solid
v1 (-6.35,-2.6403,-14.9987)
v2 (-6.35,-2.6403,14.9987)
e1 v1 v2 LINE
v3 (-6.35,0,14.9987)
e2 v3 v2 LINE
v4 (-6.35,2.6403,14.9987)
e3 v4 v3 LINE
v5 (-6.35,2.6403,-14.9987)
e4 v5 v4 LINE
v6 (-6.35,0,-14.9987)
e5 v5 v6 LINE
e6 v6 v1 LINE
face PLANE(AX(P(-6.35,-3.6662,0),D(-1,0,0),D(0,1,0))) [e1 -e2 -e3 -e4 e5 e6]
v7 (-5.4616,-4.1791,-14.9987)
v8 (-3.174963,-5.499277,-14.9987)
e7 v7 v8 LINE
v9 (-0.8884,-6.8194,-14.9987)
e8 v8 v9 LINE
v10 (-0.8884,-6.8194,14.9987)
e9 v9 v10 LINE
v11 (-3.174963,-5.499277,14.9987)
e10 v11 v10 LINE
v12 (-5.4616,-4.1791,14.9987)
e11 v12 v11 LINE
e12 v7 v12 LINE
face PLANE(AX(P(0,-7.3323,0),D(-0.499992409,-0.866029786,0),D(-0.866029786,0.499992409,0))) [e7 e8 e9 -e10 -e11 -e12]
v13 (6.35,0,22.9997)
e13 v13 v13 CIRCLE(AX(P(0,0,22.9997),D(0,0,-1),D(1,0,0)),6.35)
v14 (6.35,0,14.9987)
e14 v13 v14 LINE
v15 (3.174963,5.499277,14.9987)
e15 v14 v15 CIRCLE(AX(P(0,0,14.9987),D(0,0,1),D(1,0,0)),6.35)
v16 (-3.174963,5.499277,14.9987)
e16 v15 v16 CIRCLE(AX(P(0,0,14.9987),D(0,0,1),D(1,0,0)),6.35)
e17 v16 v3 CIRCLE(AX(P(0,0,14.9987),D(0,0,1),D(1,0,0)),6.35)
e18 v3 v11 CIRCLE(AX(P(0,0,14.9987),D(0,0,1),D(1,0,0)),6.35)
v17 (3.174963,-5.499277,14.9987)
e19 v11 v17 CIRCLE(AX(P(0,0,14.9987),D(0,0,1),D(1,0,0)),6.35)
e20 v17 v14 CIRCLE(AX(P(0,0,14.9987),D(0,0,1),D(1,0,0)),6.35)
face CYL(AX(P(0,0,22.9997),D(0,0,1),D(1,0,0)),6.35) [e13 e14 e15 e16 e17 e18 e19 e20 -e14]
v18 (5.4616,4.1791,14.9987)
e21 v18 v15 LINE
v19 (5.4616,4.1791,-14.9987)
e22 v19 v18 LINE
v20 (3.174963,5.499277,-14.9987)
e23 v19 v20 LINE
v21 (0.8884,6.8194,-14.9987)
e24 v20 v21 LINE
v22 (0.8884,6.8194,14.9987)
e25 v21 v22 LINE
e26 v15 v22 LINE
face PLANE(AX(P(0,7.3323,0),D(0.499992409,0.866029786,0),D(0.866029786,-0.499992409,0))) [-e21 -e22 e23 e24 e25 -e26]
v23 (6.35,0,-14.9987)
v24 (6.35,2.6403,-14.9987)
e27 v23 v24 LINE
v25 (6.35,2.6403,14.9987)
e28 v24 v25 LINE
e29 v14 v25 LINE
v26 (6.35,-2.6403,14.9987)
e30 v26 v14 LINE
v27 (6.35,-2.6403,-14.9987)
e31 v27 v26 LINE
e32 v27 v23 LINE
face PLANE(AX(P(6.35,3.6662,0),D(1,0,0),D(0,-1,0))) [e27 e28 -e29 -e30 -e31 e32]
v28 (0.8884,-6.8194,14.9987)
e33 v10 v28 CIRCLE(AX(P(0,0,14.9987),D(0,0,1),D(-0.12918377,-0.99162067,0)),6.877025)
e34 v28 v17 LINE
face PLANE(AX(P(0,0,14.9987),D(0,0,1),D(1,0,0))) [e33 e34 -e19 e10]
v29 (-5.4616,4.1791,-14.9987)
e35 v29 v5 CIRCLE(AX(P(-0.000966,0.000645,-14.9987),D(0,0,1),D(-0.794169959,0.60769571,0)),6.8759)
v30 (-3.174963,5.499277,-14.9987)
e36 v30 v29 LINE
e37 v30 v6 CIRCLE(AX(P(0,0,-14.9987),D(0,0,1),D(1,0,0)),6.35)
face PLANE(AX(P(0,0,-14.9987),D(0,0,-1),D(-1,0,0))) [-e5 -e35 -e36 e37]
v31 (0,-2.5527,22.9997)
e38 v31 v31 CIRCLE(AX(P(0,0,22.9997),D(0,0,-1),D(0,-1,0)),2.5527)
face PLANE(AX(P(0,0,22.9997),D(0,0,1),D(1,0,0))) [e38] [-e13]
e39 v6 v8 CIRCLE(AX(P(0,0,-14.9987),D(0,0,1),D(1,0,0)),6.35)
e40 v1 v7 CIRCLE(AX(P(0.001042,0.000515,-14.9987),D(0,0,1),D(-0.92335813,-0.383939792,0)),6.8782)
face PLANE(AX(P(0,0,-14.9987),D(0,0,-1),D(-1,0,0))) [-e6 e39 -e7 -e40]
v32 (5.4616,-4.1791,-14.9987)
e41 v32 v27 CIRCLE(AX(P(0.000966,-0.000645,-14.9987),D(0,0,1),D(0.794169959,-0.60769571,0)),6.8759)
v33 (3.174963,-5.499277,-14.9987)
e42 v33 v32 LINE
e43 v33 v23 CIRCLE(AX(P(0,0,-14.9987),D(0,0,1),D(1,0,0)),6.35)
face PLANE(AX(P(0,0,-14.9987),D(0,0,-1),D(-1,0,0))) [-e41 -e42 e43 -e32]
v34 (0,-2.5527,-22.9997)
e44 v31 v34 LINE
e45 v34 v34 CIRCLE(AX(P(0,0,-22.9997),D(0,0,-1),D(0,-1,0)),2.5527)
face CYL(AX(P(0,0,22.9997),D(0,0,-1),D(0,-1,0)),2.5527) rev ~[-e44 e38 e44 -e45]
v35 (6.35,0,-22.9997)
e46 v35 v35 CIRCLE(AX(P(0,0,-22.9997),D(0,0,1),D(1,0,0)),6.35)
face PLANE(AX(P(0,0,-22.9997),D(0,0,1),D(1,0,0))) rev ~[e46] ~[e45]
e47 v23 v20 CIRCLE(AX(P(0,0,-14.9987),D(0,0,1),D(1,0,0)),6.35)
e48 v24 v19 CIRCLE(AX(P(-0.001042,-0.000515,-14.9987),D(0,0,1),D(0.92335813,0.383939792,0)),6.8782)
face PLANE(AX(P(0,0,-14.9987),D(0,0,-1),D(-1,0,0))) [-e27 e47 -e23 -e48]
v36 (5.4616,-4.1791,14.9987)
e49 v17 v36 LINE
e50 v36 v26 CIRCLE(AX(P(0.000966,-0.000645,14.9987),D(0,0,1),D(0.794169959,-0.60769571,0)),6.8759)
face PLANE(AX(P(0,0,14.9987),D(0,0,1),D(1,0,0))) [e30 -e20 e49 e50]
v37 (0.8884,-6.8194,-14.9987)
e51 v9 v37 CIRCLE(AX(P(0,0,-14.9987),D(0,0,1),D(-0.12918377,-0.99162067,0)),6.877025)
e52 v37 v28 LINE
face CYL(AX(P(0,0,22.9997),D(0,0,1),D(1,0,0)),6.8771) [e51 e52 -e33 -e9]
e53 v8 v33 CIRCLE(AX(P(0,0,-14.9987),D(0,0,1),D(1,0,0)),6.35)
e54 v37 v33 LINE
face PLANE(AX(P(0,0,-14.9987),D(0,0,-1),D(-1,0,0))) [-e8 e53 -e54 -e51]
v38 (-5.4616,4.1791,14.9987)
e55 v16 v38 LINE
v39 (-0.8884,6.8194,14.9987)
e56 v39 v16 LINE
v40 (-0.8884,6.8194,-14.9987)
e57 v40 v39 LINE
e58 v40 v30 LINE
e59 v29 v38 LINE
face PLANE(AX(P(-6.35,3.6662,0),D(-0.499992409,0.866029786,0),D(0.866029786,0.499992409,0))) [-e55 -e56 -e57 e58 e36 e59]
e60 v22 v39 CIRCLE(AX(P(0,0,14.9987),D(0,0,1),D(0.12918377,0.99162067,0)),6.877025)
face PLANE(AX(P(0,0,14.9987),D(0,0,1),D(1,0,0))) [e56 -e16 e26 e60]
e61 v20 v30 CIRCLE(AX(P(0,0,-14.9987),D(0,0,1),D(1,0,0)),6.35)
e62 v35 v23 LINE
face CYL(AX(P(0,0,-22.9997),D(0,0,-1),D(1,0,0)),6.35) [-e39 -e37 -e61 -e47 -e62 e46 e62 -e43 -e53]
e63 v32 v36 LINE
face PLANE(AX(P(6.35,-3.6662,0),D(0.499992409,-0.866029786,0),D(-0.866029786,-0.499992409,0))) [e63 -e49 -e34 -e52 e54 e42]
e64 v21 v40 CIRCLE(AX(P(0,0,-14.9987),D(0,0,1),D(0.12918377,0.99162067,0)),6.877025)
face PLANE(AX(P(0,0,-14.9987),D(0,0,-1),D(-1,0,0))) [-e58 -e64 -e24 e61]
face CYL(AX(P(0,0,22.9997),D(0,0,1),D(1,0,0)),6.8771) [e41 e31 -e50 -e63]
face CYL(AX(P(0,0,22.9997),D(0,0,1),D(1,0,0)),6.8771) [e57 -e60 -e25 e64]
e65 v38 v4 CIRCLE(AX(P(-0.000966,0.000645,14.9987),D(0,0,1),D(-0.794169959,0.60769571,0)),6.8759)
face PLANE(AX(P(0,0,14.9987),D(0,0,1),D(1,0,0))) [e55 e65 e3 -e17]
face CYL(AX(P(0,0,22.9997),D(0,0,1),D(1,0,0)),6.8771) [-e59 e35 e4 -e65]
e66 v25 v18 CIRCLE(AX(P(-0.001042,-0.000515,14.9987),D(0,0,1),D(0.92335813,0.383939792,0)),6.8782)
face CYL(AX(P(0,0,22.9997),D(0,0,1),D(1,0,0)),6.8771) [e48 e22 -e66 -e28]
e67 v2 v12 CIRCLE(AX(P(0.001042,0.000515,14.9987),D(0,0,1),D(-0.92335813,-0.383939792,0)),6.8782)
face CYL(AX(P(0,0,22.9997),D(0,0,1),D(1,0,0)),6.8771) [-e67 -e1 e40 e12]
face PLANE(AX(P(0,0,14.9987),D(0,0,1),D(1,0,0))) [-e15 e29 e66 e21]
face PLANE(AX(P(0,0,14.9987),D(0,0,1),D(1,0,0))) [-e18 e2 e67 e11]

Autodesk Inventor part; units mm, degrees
ref_plane "YZ Plane" through (0, 0, 0) normal (1, 0, 0) x (0, 1, 0)
ref_plane "XZ Plane" through (0, 0, 0) normal (0, 1, 0) x (-1, 0, 0)
ref_plane "XY Plane" through (0, 0, 0) normal (0, 0, 1) x (1, 0, 0)
sketch "Sketch1" plane through (0, 0, 0) normal (0, 0, 1) x (1, 0, 0)
  line L0 (-6.35, -3.6662) -> (-6.35, 3.6662)
  line L1 (-6.35, 3.6662) -> (0, 7.3323)
  line L2 (0, 7.3323) -> (6.35, 3.6662)
  line L3 (6.35, 3.6662) -> (6.35, -3.6662)
  line L4 (6.35, -3.6662) -> (0, -7.3323)
  line L5 (0, -7.3323) -> (-6.35, -3.6662)
  point P0 (0, 0)
  point P1 (0, 0)
  dimension "Size" = 12.7
extrude "Extrusion1" add sketch "Sketch1" along normal mid plane 45.9994
sketch "Sketch3" plane through (0, 0, 22.9997) normal (0, 0, 1) x (1, 0, 0)
  line L0 (-6.35, 3.6662) -> (0, 7.3323) construction
  line L1 (0, 7.3323) -> (6.35, 3.6662) construction
  line L2 (6.35, 3.6662) -> (6.35, -3.6662) construction
  line L3 (6.35, -3.6662) -> (0, -7.3323) construction
  line L4 (0, -7.3323) -> (-6.35, -3.6662) construction
  line L5 (-6.35, -3.6662) -> (-6.35, 3.6662) construction
  point P0 (0, 0)
hole "Hole1" at (0, 0, 22.9997) direction (0, 0, -1) diameter 5.1054 end through all
sketch "Sketch4" plane through (0, 0, 22.9997) normal (0, 0, 1) x (1, 0, 0)
  circle A0 centre (0, 0) radius 2.5527 construction
  line L0 (-6.35, 3.6662) -> (0, 7.3323) construction
  line L1 (0, 7.3323) -> (6.35, 3.6662) construction
  line L2 (6.35, 3.6662) -> (6.35, -3.6662) construction
  line L3 (6.35, -3.6662) -> (0, -7.3323) construction
  line L4 (0, -7.3323) -> (-6.35, -3.6662) construction
  line L5 (-6.35, -3.6662) -> (-6.35, 3.6662) construction
  circle A1 centre (0, 0) radius 6.8771
  circle A2 centre (0, 0) radius 8.89
  dimension "thunder" = 13.7541
  dimension "d16" = 17.78
extrude "Extrusion3" cut sketch "Sketch4" against normal through all
sketch "Sketch5" plane through (0, 0, 22.9997) normal (0, 0, 1) x (1, 0, 0)
  circle A0 centre (0, 0) radius 6.35
  arc A1 (5.4616, -4.1791) -> (6.35, -2.6403) centre (0, 0) ccw projected
  line L0 (6.35, -2.6403) -> (6.35, 2.6403) projected
  arc A2 (6.35, 2.6403) -> (5.4616, 4.1791) centre (0, 0) ccw projected
  line L1 (5.4616, 4.1791) -> (0.8884, 6.8194) projected
  arc A3 (0.8884, 6.8194) -> (-0.8884, 6.8194) centre (0, 0) ccw projected
  line L2 (-0.8884, 6.8194) -> (-5.4616, 4.1791) projected
  arc A4 (-5.4616, 4.1791) -> (-6.35, 2.6403) centre (0, 0) ccw projected
  line L3 (-6.35, 2.6403) -> (-6.35, -2.6403) projected
  arc A5 (-6.35, -2.6403) -> (-5.4616, -4.1791) centre (0, 0) ccw projected
  line L4 (-5.4616, -4.1791) -> (-0.8884, -6.8194) projected
  arc A6 (-0.8884, -6.8194) -> (0.8884, -6.8194) centre (0, 0) ccw projected
  line L5 (0.8884, -6.8194) -> (5.4616, -4.1791) projected
  circle A7 centre (0, 0) radius 2.5527 projected
  point P0 (3.175, -5.4993)
  point P1 (-3.175, -5.4993)
  point P2 (-6.35, 0)
  point P3 (-3.175, 5.4993)
  point P4 (3.175, 5.4993)
  point P5 (6.35, 0)
  dimension "d19" = 12.7
extrude "Extrusion4" cut sketch "Sketch5" against normal blind 8.001 contours L0 A1 L5 A0 | A0 L1 A2 L0 | A0 L2 A3 L1 | L5 A6 L4 A0 | A0 L3 A4 L2 | L4 A5 L3 A0
mirror "Mirror2" about plane through (0, 0, 0) normal (0, 0, 1) of "Extrusion4"
ref_plane "Work Plane1" through (0, 0, 0) normal (0, 0, 1) x (1, 0, 0)
equation "\"bearing\" = 25.4"
properties part number "GP5-029" material "Aluminum 6061"
